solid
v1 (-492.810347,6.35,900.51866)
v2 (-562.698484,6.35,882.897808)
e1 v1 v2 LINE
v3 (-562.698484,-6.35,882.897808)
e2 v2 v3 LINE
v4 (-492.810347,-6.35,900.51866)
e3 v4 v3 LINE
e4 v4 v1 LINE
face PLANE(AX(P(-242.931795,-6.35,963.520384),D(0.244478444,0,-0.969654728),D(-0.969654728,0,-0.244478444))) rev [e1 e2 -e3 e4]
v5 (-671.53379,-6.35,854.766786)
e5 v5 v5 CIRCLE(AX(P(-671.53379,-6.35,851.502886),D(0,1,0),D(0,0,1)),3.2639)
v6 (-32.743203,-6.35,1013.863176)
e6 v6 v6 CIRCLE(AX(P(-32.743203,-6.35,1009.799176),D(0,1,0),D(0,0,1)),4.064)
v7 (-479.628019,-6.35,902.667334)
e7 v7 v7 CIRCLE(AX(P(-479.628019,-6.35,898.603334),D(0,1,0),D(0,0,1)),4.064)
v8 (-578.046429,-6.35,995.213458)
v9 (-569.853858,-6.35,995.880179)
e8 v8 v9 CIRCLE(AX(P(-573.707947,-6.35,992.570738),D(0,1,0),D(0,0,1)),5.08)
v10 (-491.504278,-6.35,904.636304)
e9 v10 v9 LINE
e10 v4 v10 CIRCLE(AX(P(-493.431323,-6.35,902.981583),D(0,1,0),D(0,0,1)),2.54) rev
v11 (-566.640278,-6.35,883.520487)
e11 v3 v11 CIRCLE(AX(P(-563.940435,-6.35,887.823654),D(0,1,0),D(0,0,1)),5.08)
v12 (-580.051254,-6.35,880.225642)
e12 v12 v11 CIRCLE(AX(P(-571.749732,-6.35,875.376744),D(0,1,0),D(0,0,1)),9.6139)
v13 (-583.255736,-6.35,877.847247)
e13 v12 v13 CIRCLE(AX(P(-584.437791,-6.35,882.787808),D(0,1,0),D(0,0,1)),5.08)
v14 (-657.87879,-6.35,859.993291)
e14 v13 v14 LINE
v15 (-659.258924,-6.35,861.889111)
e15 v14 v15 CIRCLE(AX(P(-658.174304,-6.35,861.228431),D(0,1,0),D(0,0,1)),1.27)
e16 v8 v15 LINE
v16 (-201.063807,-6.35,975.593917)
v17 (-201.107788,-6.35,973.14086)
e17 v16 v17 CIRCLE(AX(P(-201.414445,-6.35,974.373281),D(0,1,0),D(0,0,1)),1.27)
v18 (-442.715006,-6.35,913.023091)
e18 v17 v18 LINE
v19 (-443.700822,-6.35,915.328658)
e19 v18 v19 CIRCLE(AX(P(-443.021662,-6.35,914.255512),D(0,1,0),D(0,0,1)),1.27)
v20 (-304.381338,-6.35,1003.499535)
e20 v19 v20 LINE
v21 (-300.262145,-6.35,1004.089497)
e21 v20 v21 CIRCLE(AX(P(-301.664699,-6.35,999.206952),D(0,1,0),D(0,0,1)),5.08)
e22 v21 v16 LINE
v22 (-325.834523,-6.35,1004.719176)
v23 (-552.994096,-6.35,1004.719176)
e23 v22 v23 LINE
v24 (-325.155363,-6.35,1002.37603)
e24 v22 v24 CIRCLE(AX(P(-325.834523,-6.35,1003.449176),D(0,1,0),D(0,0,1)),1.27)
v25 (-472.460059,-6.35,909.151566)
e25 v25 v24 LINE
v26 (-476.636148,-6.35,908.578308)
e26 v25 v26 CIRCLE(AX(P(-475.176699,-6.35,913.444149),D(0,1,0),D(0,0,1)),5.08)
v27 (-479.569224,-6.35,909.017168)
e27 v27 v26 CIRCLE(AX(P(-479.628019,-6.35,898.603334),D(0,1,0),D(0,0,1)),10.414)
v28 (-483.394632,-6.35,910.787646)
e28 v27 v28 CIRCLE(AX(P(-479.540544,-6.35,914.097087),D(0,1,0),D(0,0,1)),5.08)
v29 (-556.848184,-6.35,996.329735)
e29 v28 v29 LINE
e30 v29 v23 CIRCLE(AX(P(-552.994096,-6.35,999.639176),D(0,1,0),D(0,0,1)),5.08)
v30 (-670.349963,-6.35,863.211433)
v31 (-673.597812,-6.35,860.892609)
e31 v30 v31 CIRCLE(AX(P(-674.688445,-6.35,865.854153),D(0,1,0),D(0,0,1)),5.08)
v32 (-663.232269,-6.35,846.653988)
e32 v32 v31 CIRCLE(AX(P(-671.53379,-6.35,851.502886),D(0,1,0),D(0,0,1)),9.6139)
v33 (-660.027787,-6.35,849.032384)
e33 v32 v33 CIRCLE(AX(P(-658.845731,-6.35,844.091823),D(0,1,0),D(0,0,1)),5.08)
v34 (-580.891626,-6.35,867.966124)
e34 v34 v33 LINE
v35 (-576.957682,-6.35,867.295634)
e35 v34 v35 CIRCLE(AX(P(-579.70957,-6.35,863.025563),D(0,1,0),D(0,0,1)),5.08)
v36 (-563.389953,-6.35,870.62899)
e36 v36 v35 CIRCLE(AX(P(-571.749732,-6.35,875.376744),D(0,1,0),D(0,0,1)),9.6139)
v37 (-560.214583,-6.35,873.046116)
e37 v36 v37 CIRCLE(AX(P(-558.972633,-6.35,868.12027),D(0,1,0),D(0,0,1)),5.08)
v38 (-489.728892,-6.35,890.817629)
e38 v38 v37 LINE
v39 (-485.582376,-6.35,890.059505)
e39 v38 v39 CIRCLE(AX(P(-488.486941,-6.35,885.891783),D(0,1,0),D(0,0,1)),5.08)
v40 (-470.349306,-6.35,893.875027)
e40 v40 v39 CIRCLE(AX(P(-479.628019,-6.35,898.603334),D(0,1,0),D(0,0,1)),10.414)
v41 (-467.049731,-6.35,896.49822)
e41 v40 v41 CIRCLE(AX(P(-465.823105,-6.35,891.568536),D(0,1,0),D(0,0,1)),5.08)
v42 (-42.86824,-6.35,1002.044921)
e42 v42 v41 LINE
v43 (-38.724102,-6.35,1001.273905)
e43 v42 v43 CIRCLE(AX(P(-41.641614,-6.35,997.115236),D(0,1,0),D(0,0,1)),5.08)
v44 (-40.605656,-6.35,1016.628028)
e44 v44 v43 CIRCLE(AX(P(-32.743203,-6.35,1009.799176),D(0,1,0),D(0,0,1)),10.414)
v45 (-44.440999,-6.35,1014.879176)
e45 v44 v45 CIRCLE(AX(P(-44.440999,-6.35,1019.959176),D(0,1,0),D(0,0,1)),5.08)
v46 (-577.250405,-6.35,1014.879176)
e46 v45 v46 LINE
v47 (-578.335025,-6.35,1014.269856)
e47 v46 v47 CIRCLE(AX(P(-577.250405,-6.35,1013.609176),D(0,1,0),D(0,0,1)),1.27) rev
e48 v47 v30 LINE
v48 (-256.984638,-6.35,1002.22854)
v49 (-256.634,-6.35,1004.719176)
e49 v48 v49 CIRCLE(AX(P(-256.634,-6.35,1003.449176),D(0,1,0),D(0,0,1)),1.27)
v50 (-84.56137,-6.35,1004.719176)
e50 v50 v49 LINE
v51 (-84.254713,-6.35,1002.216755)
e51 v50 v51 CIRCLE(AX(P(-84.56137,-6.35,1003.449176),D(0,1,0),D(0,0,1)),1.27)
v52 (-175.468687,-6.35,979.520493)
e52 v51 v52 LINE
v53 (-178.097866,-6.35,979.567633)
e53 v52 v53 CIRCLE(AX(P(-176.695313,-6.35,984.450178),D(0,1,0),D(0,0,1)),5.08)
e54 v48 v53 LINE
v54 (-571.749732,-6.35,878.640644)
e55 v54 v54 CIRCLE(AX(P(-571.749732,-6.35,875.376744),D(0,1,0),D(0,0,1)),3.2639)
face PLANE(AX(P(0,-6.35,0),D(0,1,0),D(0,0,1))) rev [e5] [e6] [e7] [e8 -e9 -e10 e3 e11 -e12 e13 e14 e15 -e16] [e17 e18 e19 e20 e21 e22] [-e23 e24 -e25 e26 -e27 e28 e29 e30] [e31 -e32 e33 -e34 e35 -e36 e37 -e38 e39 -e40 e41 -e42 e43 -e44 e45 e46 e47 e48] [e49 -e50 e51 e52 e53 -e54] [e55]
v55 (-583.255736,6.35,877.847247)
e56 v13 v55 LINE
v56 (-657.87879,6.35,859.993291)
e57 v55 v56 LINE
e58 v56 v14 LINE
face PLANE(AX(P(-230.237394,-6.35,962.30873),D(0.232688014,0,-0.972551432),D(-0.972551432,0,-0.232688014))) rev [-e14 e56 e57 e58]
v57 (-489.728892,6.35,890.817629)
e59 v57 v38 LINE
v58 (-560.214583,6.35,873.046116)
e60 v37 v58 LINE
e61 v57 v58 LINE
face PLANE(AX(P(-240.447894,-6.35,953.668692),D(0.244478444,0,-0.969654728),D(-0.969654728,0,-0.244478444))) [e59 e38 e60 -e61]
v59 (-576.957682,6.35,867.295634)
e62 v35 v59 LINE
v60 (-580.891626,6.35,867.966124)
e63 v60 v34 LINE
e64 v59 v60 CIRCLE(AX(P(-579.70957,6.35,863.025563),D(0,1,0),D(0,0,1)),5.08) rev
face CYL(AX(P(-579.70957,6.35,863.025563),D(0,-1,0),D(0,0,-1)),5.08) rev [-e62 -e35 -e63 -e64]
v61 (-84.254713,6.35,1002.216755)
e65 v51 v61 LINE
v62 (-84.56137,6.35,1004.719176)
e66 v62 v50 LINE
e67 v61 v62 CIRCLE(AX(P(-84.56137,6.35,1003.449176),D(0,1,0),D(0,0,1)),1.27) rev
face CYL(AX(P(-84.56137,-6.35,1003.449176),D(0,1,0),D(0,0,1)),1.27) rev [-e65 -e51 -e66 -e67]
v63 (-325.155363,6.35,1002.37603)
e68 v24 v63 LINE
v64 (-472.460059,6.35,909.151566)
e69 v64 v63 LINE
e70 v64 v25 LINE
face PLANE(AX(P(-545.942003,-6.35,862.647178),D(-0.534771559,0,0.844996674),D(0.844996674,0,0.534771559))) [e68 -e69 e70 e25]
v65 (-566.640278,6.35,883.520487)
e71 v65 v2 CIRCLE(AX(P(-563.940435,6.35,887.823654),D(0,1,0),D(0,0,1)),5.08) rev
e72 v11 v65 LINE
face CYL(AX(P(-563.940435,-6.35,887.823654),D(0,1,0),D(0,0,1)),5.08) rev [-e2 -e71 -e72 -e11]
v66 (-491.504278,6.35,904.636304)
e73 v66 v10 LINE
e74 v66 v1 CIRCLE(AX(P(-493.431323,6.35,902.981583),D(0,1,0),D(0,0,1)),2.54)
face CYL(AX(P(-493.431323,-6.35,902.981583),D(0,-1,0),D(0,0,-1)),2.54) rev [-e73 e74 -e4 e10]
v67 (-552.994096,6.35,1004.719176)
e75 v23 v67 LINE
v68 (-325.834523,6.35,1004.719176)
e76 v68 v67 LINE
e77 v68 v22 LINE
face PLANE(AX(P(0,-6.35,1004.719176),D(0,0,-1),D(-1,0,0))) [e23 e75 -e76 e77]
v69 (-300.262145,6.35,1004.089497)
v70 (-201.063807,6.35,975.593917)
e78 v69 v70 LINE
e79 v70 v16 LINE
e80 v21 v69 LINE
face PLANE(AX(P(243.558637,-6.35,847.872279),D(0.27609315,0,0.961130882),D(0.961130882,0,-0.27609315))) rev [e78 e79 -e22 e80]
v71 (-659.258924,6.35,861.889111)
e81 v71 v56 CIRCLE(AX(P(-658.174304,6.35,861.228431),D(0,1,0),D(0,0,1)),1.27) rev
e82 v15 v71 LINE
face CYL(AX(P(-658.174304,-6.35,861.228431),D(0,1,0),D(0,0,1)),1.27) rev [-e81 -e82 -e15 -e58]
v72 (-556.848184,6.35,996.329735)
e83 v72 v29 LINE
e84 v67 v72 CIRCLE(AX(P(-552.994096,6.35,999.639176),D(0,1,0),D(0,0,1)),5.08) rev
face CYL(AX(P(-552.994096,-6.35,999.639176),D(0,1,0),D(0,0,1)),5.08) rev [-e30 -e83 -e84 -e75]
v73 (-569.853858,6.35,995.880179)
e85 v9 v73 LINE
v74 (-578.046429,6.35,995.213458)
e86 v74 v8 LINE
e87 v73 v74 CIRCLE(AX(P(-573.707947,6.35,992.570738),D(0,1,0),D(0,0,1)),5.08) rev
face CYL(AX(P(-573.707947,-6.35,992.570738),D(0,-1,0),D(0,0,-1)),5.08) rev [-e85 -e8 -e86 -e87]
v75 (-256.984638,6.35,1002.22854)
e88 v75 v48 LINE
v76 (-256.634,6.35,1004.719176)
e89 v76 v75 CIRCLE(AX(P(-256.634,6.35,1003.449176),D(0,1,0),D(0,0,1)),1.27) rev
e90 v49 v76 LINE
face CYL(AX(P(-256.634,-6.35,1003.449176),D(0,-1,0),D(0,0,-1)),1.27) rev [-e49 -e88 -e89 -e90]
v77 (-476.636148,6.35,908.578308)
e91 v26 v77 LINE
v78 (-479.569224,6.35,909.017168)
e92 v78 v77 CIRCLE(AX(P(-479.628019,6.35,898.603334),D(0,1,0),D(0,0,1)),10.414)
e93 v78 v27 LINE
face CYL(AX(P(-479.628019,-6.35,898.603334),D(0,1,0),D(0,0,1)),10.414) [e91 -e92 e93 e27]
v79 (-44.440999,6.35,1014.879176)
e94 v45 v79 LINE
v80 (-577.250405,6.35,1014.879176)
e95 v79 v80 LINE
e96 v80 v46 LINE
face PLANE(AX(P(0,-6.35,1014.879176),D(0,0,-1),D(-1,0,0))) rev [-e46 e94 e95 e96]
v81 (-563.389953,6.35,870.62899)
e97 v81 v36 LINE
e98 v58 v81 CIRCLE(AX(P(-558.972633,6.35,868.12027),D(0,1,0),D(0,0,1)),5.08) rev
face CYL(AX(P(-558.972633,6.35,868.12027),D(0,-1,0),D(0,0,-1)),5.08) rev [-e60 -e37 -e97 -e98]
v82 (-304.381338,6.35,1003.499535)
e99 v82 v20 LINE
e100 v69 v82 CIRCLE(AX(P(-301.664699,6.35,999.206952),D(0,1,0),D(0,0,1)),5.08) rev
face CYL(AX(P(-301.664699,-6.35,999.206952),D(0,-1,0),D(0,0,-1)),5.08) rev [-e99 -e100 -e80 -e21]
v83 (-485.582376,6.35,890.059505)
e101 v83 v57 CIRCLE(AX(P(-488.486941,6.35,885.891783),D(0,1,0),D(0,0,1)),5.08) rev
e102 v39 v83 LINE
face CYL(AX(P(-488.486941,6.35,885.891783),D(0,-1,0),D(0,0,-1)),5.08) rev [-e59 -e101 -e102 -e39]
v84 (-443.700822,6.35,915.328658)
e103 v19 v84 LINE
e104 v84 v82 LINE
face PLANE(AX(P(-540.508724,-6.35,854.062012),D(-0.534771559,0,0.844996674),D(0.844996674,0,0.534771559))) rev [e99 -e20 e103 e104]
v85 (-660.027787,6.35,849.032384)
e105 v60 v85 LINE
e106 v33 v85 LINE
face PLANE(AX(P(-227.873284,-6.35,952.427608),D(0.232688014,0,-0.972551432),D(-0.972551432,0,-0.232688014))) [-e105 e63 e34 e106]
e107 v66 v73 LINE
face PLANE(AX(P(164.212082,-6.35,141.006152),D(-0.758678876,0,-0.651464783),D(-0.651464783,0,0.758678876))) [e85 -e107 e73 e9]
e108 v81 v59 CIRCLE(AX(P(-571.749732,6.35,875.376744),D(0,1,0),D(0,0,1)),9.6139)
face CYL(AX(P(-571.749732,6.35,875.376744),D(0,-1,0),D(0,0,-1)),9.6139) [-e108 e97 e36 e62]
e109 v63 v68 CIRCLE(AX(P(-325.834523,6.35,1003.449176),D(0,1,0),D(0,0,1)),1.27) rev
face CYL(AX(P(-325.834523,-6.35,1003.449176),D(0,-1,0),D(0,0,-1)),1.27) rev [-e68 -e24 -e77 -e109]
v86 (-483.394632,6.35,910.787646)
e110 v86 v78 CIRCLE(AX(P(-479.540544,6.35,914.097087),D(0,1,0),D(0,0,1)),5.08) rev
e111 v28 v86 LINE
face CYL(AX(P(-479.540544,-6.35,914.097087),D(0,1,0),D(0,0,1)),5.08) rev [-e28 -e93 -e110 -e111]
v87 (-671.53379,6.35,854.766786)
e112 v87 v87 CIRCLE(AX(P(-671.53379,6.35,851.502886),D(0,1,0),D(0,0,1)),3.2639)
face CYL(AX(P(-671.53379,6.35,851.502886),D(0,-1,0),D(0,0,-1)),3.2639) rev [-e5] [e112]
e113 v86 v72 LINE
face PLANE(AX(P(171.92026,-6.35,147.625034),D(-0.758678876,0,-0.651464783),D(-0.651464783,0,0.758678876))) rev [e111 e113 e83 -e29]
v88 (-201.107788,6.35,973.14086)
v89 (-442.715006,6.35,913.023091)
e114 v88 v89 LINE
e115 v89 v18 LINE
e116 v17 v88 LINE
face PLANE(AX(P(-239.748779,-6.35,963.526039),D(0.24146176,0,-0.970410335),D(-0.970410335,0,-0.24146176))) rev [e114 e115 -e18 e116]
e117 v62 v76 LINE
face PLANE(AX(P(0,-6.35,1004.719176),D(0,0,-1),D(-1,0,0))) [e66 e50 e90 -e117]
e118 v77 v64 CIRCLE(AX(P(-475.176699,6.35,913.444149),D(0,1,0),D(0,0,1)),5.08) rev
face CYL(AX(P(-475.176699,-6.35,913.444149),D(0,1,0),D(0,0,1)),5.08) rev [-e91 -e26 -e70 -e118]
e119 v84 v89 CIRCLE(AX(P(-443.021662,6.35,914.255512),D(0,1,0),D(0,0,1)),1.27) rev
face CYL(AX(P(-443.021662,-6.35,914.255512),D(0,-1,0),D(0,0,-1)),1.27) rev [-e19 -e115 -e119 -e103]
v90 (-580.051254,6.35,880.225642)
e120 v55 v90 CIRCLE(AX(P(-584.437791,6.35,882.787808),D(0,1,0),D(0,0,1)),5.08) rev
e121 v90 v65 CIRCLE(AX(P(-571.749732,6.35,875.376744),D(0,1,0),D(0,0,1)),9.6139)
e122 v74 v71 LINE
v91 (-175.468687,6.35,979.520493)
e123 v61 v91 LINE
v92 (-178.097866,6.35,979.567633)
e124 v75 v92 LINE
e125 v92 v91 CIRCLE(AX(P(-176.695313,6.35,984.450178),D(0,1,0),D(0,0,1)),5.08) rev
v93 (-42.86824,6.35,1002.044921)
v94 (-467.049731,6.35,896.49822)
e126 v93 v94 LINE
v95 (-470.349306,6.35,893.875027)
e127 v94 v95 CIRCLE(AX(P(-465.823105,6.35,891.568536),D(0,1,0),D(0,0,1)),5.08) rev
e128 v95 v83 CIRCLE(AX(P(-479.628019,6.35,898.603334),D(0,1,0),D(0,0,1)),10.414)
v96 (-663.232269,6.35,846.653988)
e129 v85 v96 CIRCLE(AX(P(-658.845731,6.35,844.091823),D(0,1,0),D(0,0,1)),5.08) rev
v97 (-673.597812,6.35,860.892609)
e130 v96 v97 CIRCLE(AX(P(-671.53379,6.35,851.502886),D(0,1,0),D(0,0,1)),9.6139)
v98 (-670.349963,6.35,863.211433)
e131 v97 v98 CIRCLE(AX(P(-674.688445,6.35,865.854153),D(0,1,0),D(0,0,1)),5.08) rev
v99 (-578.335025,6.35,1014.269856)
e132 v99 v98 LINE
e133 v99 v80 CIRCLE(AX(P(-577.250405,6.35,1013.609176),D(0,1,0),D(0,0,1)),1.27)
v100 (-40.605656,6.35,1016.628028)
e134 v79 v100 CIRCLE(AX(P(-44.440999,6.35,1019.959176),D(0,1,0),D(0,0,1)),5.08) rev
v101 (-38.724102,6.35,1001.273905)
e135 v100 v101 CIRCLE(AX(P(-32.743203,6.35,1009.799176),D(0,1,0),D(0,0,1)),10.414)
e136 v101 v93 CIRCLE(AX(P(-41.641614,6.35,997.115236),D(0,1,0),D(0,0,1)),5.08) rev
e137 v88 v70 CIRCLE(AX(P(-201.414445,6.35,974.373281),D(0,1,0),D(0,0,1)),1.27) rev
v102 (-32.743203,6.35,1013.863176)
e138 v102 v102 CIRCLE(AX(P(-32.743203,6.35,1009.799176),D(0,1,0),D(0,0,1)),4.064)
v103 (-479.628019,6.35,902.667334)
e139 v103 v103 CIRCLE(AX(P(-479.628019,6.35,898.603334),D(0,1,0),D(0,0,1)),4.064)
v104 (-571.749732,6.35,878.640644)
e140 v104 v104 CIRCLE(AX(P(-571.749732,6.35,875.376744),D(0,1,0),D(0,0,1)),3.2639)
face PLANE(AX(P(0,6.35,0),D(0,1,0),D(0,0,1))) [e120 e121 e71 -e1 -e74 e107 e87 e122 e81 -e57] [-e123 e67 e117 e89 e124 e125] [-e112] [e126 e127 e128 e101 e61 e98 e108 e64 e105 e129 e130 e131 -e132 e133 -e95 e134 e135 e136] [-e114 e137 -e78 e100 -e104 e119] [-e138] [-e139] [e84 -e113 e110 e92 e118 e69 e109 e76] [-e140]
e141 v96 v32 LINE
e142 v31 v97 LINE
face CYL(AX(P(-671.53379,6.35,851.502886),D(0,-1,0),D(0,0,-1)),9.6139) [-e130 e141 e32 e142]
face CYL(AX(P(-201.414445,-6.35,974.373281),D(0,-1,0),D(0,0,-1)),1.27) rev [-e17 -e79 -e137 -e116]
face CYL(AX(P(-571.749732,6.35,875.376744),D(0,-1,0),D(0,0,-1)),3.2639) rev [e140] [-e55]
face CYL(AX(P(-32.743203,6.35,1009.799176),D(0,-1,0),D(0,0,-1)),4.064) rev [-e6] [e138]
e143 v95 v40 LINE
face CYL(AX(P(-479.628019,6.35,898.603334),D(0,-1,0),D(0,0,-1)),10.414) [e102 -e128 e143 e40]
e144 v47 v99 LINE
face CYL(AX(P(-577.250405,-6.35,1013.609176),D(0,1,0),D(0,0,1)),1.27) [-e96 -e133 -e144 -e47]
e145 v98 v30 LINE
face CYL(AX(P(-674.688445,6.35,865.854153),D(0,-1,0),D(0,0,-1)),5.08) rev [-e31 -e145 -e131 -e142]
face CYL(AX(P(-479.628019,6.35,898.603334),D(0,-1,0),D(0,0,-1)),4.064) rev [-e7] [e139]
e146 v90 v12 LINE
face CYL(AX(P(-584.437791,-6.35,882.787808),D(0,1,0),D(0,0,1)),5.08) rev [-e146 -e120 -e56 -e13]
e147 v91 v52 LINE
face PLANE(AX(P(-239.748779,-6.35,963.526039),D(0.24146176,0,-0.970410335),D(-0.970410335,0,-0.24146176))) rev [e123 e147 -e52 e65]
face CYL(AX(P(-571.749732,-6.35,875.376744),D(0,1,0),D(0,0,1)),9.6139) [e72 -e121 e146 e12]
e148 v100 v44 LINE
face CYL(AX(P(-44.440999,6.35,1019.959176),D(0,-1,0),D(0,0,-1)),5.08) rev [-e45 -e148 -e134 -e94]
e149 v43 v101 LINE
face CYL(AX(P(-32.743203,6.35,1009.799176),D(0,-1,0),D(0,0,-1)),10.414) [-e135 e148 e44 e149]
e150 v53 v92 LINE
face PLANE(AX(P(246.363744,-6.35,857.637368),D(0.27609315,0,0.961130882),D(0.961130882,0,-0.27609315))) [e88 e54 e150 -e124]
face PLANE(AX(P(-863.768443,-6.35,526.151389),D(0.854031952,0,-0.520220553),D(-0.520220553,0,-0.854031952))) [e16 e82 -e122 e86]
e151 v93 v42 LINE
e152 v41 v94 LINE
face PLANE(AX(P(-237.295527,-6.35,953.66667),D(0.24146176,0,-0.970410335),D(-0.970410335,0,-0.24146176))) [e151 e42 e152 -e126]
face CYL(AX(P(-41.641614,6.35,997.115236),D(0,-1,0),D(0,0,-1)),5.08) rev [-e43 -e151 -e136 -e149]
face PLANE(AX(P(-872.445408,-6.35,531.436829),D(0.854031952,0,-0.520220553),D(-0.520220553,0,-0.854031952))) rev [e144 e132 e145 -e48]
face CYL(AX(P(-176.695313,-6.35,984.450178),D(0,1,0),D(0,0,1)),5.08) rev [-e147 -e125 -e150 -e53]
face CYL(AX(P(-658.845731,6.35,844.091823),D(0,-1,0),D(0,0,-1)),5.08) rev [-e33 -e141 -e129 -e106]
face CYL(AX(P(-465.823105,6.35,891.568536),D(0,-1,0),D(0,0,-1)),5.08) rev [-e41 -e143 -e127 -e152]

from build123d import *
from build123d.topology import SkipClean

# Parameters (mm, degrees)
SKETCH1_R           = 4.064
SKETCH1_R_2         = 3.2639
BOSS_EXTRUDE1_DEPTH = 6.35
CUT_EXTRUDE1_DEPTH  = 1227.767455485
FILLET1_R           = 5.08
FILLET2_R           = 1.27
FILLET3_R           = 2.54


with BuildPart() as part:
    # Sketch1 → Boss-Extrude1 (new, symmetric)
    with BuildSketch(Plane(origin=(0, 0, 0), x_dir=(1, 0, 0), z_dir=(0, 1, 0))):
        with BuildLine():
            Line((-580.023560274, -1020.213175904), (-32.743203186, -1020.213175904))
            ThreePointArc((-32.743203186, -1020.213175904), (-22.406526942, -1011.065872486), (-30.22862042, -999.693322674))
            Line((-30.22862042, -999.693322674), (-477.113436037, -888.497480987))
            ThreePointArc((-477.113436037, -888.497480987), (-477.140285594, -888.490838013), (-477.1671527, -888.484266374))
            Line((-477.1671527, -888.484266374), (-569.477932839, -866.035116584))
            ThreePointArc((-569.477932839, -866.035116584), (-569.495309073, -866.030907949), (-569.512693103, -866.026731636))
            Line((-569.512693103, -866.026731636), (-669.296750672, -842.152874275))
            ThreePointArc((-669.296750672, -842.152874275), (-679.306252785, -845.844627483), (-679.744367756, -856.504234867))
            Line((-679.744367756, -856.504234867), (-580.023560274, -1020.213175904))
        make_face()
        with Locations(Location((-32.743203186, -1009.799175904, 0), (0, 0, 270))):
            Circle(SKETCH1_R, mode=Mode.SUBTRACT)
        with Locations(Location((-479.628018803, -898.603334218, 0), (0, 0, 270))):
            Circle(SKETCH1_R, mode=Mode.SUBTRACT)
        with Locations(Location((-571.749732399, -875.37674385, 0), (0, 0, 270))):
            Circle(SKETCH1_R_2, mode=Mode.SUBTRACT)
        with Locations(Location((-671.533789968, -851.502886488, 0), (0, 0, 270))):
            Circle(SKETCH1_R_2, mode=Mode.SUBTRACT)
    extrude(amount=BOSS_EXTRUDE1_DEPTH, both=True)

    # Sketch2 → Cut-Extrude1 (cut, through all)
    with SkipClean():  # the faces are left unmerged after this step: merging them gives an invalid solid
        with BuildSketch(Plane(origin=(0, 6.35, 0), x_dir=(1, 0, 0), z_dir=(0, 1, 0))):
            with BuildLine():
                Line((-679.744367756, -856.504234867), (-580.023560274, -1020.213175904))
                Line((-580.023560274, -1020.213175904), (-32.743203186, -1020.213175904))
                ThreePointArc((-32.743203186, -1020.213175904), (-38.013320642, -1018.781227897), (-41.834132511, -1014.879175904))
                Line((-41.834132511, -1014.879175904), (-577.963867352, -1014.879175904))
                Line((-577.963867352, -1014.879175904), (-671.626154715, -861.116342785))
                ThreePointArc((-671.626154715, -861.116342785), (-676.282747595, -859.861981814), (-679.744367756, -856.504234867))
            make_face()
            with BuildLine():
                Line((-569.512693103, -866.026731636), (-669.296750672, -842.152874275))
                ThreePointArc((-669.296750672, -842.152874275), (-665.037914564, -844.415526194), (-662.413625342, -848.461559408))
                Line((-662.413625342, -848.461559408), (-578.505786805, -868.536948379))
                ThreePointArc((-578.505786805, -868.536948379), (-574.334431882, -866.116808548), (-569.512693103, -866.026731636))
            make_face()
            with BuildLine():
                Line((-469.57946129, -895.868761508), (-40.33850922, -1002.674379609))
                ThreePointArc((-40.33850922, -1002.674379609), (-35.688557552, -999.810367984), (-30.22862042, -999.693322674))
                Line((-30.22862042, -999.693322674), (-477.113436037, -888.497480987))
                ThreePointArc((-477.113436037, -888.497480987), (-472.345020276, -891.159589968), (-469.57946129, -895.868761508))
            make_face()
            with BuildLine():
                Line((-477.1671527, -888.484266374), (-569.477932839, -866.035116584))
                ThreePointArc((-569.477932839, -866.035116584), (-565.197857445, -868.341119656), (-562.593315725, -872.446367271))
                Line((-562.593315725, -872.446367271), (-487.201130908, -891.45495195))
                ThreePointArc((-487.201130908, -891.45495195), (-482.584369255, -888.617775245), (-477.1671527, -888.484266374))
            make_face()
            with BuildLine():
                ThreePointArc((-565.077216711, -882.298059303), (-574.043489966, -884.713003777), (-580.869897025, -878.41807093))
                Line((-580.869897025, -878.41807093), (-660.846200897, -859.283322179))
                Line((-660.846200897, -859.283322179), (-574.408981883, -1001.184956836))
                Line((-574.408981883, -1001.184956836), (-489.404527792, -902.190989161))
                ThreePointArc((-489.404527792, -902.190989161), (-489.554632834, -901.751941826), (-489.685031894, -901.306643982))
                Line((-489.685031894, -901.306643982), (-565.077216711, -882.298059303))
            make_face()
            Polygon((-196.508330191, -974.285316963), (-450.342933685, -911.125076565), (-302.454173976, -1004.719175904), align=None)
            with BuildLine():
                Line((-321.452940497, -1004.719175904), (-474.662853281, -907.757487774))
                ThreePointArc((-474.662853281, -907.757487774), (-478.086983606, -908.902684028), (-481.696350414, -908.809871355))
                Line((-481.696350414, -908.809871355), (-564.05205619, -1004.719175904))
                Line((-564.05205619, -1004.719175904), (-321.452940497, -1004.719175904))
            make_face()
            Polygon((-74.197736242, -1004.719175904), (-176.789592181, -979.191819922), (-265.654999436, -1004.719175904), align=None)
        extrude(amount=-CUT_EXTRUDE1_DEPTH, mode=Mode.SUBTRACT)

    # Fillet1
    fillet1_edges = [part.edges().sort_by_distance(p)[0] for p in [
        (-662.413625342, 0, 848.461559408),
        (-578.505786805, 0, 868.536948379),
        (-671.626154715, 0, 861.116342785),
        (-41.834132511, 0, 1014.879175904),
        (-302.454173976, 0, 1004.719175904),
        (-176.789592181, 0, 979.191819922),
        (-580.869897025, 0, 878.41807093),
        (-565.077216711, 0, 882.298059303),
        (-574.408981883, 0, 1001.184956836),
        (-469.57946129, 0, 895.868761508),
        (-40.33850922, 0, 1002.674379609),
        (-481.696350414, 0, 908.809871355),
        (-474.662853281, 0, 907.757487774),
        (-564.05205619, 0, 1004.719175904),
        (-562.593315725, 0, 872.446367271),
        (-487.201130908, 0, 891.45495195),
    ]]
    fillet(fillet1_edges, radius=FILLET1_R)

    # Fillet2
    fillet2_edges = [part.edges().sort_by_distance(p)[0] for p in [
        (-577.963867352, 0, 1014.879175904),
        (-450.342933685, 0, 911.125076565),
        (-196.508330191, 0, 974.285316963),
        (-74.197736242, 0, 1004.719175904),
        (-265.654999436, 0, 1004.719175904),
        (-660.846200897, 0, 859.283322179),
        (-321.452940497, 0, 1004.719175904),
    ]]
    fillet(fillet2_edges, radius=FILLET2_R)

    # Fillet3
    # the kernel refuses this fillet: 2.54 mm, written as the material it adds along each edge
    with BuildSketch(Plane(origin=(-489.685031894, 6.35, 901.306643982), x_dir=(-0.9696547275451901, 0, -0.24447844352675166), z_dir=(0, -1, 0))) as fillet3_piece_1:
        with BuildLine():
            CenterArc((3.223121953, -2.54), FILLET3_R, 90, 116.501118017)
            Line((0.95001079, -3.673386801), (0.722699673, -3.786725481))
            ThreePointArc((0.722699673, -3.786725481), (-0.715506578, -0.902270957), (-0.221729984, 0.123902439))
            Line((-0.221729984, 0.123902439), (0, 0.254))
            Line((0, 0.254), (3.223121953, 0.254))
            Line((3.223121953, 0.254), (3.223121953, 0))
        make_face()
    extrude(amount=12.7)
    with BuildSketch(Plane(origin=(-489.404527792, 6.35, 902.190989161), x_dir=(-0.6514647829655796, 0, 0.7586788757805311), z_dir=(0, -1, 0))) as fillet3_piece_2:
        with BuildLine():
            CenterArc((3.223121953, 2.54), FILLET3_R, 153.498881983, 116.501118017)
            Line((0.95001079, 3.673386801), (0.722699673, 3.786725481))
            ThreePointArc((0.722699673, 3.786725481), (-0.715506578, 0.902270957), (-0.221729984, -0.123902439))
            Line((-0.221729984, -0.123902439), (0, -0.254))
            Line((0, -0.254), (3.223121953, -0.254))
            Line((3.223121953, -0.254), (3.223121953, 0))
        make_face()
    extrude(amount=12.7)


solid = part.part
